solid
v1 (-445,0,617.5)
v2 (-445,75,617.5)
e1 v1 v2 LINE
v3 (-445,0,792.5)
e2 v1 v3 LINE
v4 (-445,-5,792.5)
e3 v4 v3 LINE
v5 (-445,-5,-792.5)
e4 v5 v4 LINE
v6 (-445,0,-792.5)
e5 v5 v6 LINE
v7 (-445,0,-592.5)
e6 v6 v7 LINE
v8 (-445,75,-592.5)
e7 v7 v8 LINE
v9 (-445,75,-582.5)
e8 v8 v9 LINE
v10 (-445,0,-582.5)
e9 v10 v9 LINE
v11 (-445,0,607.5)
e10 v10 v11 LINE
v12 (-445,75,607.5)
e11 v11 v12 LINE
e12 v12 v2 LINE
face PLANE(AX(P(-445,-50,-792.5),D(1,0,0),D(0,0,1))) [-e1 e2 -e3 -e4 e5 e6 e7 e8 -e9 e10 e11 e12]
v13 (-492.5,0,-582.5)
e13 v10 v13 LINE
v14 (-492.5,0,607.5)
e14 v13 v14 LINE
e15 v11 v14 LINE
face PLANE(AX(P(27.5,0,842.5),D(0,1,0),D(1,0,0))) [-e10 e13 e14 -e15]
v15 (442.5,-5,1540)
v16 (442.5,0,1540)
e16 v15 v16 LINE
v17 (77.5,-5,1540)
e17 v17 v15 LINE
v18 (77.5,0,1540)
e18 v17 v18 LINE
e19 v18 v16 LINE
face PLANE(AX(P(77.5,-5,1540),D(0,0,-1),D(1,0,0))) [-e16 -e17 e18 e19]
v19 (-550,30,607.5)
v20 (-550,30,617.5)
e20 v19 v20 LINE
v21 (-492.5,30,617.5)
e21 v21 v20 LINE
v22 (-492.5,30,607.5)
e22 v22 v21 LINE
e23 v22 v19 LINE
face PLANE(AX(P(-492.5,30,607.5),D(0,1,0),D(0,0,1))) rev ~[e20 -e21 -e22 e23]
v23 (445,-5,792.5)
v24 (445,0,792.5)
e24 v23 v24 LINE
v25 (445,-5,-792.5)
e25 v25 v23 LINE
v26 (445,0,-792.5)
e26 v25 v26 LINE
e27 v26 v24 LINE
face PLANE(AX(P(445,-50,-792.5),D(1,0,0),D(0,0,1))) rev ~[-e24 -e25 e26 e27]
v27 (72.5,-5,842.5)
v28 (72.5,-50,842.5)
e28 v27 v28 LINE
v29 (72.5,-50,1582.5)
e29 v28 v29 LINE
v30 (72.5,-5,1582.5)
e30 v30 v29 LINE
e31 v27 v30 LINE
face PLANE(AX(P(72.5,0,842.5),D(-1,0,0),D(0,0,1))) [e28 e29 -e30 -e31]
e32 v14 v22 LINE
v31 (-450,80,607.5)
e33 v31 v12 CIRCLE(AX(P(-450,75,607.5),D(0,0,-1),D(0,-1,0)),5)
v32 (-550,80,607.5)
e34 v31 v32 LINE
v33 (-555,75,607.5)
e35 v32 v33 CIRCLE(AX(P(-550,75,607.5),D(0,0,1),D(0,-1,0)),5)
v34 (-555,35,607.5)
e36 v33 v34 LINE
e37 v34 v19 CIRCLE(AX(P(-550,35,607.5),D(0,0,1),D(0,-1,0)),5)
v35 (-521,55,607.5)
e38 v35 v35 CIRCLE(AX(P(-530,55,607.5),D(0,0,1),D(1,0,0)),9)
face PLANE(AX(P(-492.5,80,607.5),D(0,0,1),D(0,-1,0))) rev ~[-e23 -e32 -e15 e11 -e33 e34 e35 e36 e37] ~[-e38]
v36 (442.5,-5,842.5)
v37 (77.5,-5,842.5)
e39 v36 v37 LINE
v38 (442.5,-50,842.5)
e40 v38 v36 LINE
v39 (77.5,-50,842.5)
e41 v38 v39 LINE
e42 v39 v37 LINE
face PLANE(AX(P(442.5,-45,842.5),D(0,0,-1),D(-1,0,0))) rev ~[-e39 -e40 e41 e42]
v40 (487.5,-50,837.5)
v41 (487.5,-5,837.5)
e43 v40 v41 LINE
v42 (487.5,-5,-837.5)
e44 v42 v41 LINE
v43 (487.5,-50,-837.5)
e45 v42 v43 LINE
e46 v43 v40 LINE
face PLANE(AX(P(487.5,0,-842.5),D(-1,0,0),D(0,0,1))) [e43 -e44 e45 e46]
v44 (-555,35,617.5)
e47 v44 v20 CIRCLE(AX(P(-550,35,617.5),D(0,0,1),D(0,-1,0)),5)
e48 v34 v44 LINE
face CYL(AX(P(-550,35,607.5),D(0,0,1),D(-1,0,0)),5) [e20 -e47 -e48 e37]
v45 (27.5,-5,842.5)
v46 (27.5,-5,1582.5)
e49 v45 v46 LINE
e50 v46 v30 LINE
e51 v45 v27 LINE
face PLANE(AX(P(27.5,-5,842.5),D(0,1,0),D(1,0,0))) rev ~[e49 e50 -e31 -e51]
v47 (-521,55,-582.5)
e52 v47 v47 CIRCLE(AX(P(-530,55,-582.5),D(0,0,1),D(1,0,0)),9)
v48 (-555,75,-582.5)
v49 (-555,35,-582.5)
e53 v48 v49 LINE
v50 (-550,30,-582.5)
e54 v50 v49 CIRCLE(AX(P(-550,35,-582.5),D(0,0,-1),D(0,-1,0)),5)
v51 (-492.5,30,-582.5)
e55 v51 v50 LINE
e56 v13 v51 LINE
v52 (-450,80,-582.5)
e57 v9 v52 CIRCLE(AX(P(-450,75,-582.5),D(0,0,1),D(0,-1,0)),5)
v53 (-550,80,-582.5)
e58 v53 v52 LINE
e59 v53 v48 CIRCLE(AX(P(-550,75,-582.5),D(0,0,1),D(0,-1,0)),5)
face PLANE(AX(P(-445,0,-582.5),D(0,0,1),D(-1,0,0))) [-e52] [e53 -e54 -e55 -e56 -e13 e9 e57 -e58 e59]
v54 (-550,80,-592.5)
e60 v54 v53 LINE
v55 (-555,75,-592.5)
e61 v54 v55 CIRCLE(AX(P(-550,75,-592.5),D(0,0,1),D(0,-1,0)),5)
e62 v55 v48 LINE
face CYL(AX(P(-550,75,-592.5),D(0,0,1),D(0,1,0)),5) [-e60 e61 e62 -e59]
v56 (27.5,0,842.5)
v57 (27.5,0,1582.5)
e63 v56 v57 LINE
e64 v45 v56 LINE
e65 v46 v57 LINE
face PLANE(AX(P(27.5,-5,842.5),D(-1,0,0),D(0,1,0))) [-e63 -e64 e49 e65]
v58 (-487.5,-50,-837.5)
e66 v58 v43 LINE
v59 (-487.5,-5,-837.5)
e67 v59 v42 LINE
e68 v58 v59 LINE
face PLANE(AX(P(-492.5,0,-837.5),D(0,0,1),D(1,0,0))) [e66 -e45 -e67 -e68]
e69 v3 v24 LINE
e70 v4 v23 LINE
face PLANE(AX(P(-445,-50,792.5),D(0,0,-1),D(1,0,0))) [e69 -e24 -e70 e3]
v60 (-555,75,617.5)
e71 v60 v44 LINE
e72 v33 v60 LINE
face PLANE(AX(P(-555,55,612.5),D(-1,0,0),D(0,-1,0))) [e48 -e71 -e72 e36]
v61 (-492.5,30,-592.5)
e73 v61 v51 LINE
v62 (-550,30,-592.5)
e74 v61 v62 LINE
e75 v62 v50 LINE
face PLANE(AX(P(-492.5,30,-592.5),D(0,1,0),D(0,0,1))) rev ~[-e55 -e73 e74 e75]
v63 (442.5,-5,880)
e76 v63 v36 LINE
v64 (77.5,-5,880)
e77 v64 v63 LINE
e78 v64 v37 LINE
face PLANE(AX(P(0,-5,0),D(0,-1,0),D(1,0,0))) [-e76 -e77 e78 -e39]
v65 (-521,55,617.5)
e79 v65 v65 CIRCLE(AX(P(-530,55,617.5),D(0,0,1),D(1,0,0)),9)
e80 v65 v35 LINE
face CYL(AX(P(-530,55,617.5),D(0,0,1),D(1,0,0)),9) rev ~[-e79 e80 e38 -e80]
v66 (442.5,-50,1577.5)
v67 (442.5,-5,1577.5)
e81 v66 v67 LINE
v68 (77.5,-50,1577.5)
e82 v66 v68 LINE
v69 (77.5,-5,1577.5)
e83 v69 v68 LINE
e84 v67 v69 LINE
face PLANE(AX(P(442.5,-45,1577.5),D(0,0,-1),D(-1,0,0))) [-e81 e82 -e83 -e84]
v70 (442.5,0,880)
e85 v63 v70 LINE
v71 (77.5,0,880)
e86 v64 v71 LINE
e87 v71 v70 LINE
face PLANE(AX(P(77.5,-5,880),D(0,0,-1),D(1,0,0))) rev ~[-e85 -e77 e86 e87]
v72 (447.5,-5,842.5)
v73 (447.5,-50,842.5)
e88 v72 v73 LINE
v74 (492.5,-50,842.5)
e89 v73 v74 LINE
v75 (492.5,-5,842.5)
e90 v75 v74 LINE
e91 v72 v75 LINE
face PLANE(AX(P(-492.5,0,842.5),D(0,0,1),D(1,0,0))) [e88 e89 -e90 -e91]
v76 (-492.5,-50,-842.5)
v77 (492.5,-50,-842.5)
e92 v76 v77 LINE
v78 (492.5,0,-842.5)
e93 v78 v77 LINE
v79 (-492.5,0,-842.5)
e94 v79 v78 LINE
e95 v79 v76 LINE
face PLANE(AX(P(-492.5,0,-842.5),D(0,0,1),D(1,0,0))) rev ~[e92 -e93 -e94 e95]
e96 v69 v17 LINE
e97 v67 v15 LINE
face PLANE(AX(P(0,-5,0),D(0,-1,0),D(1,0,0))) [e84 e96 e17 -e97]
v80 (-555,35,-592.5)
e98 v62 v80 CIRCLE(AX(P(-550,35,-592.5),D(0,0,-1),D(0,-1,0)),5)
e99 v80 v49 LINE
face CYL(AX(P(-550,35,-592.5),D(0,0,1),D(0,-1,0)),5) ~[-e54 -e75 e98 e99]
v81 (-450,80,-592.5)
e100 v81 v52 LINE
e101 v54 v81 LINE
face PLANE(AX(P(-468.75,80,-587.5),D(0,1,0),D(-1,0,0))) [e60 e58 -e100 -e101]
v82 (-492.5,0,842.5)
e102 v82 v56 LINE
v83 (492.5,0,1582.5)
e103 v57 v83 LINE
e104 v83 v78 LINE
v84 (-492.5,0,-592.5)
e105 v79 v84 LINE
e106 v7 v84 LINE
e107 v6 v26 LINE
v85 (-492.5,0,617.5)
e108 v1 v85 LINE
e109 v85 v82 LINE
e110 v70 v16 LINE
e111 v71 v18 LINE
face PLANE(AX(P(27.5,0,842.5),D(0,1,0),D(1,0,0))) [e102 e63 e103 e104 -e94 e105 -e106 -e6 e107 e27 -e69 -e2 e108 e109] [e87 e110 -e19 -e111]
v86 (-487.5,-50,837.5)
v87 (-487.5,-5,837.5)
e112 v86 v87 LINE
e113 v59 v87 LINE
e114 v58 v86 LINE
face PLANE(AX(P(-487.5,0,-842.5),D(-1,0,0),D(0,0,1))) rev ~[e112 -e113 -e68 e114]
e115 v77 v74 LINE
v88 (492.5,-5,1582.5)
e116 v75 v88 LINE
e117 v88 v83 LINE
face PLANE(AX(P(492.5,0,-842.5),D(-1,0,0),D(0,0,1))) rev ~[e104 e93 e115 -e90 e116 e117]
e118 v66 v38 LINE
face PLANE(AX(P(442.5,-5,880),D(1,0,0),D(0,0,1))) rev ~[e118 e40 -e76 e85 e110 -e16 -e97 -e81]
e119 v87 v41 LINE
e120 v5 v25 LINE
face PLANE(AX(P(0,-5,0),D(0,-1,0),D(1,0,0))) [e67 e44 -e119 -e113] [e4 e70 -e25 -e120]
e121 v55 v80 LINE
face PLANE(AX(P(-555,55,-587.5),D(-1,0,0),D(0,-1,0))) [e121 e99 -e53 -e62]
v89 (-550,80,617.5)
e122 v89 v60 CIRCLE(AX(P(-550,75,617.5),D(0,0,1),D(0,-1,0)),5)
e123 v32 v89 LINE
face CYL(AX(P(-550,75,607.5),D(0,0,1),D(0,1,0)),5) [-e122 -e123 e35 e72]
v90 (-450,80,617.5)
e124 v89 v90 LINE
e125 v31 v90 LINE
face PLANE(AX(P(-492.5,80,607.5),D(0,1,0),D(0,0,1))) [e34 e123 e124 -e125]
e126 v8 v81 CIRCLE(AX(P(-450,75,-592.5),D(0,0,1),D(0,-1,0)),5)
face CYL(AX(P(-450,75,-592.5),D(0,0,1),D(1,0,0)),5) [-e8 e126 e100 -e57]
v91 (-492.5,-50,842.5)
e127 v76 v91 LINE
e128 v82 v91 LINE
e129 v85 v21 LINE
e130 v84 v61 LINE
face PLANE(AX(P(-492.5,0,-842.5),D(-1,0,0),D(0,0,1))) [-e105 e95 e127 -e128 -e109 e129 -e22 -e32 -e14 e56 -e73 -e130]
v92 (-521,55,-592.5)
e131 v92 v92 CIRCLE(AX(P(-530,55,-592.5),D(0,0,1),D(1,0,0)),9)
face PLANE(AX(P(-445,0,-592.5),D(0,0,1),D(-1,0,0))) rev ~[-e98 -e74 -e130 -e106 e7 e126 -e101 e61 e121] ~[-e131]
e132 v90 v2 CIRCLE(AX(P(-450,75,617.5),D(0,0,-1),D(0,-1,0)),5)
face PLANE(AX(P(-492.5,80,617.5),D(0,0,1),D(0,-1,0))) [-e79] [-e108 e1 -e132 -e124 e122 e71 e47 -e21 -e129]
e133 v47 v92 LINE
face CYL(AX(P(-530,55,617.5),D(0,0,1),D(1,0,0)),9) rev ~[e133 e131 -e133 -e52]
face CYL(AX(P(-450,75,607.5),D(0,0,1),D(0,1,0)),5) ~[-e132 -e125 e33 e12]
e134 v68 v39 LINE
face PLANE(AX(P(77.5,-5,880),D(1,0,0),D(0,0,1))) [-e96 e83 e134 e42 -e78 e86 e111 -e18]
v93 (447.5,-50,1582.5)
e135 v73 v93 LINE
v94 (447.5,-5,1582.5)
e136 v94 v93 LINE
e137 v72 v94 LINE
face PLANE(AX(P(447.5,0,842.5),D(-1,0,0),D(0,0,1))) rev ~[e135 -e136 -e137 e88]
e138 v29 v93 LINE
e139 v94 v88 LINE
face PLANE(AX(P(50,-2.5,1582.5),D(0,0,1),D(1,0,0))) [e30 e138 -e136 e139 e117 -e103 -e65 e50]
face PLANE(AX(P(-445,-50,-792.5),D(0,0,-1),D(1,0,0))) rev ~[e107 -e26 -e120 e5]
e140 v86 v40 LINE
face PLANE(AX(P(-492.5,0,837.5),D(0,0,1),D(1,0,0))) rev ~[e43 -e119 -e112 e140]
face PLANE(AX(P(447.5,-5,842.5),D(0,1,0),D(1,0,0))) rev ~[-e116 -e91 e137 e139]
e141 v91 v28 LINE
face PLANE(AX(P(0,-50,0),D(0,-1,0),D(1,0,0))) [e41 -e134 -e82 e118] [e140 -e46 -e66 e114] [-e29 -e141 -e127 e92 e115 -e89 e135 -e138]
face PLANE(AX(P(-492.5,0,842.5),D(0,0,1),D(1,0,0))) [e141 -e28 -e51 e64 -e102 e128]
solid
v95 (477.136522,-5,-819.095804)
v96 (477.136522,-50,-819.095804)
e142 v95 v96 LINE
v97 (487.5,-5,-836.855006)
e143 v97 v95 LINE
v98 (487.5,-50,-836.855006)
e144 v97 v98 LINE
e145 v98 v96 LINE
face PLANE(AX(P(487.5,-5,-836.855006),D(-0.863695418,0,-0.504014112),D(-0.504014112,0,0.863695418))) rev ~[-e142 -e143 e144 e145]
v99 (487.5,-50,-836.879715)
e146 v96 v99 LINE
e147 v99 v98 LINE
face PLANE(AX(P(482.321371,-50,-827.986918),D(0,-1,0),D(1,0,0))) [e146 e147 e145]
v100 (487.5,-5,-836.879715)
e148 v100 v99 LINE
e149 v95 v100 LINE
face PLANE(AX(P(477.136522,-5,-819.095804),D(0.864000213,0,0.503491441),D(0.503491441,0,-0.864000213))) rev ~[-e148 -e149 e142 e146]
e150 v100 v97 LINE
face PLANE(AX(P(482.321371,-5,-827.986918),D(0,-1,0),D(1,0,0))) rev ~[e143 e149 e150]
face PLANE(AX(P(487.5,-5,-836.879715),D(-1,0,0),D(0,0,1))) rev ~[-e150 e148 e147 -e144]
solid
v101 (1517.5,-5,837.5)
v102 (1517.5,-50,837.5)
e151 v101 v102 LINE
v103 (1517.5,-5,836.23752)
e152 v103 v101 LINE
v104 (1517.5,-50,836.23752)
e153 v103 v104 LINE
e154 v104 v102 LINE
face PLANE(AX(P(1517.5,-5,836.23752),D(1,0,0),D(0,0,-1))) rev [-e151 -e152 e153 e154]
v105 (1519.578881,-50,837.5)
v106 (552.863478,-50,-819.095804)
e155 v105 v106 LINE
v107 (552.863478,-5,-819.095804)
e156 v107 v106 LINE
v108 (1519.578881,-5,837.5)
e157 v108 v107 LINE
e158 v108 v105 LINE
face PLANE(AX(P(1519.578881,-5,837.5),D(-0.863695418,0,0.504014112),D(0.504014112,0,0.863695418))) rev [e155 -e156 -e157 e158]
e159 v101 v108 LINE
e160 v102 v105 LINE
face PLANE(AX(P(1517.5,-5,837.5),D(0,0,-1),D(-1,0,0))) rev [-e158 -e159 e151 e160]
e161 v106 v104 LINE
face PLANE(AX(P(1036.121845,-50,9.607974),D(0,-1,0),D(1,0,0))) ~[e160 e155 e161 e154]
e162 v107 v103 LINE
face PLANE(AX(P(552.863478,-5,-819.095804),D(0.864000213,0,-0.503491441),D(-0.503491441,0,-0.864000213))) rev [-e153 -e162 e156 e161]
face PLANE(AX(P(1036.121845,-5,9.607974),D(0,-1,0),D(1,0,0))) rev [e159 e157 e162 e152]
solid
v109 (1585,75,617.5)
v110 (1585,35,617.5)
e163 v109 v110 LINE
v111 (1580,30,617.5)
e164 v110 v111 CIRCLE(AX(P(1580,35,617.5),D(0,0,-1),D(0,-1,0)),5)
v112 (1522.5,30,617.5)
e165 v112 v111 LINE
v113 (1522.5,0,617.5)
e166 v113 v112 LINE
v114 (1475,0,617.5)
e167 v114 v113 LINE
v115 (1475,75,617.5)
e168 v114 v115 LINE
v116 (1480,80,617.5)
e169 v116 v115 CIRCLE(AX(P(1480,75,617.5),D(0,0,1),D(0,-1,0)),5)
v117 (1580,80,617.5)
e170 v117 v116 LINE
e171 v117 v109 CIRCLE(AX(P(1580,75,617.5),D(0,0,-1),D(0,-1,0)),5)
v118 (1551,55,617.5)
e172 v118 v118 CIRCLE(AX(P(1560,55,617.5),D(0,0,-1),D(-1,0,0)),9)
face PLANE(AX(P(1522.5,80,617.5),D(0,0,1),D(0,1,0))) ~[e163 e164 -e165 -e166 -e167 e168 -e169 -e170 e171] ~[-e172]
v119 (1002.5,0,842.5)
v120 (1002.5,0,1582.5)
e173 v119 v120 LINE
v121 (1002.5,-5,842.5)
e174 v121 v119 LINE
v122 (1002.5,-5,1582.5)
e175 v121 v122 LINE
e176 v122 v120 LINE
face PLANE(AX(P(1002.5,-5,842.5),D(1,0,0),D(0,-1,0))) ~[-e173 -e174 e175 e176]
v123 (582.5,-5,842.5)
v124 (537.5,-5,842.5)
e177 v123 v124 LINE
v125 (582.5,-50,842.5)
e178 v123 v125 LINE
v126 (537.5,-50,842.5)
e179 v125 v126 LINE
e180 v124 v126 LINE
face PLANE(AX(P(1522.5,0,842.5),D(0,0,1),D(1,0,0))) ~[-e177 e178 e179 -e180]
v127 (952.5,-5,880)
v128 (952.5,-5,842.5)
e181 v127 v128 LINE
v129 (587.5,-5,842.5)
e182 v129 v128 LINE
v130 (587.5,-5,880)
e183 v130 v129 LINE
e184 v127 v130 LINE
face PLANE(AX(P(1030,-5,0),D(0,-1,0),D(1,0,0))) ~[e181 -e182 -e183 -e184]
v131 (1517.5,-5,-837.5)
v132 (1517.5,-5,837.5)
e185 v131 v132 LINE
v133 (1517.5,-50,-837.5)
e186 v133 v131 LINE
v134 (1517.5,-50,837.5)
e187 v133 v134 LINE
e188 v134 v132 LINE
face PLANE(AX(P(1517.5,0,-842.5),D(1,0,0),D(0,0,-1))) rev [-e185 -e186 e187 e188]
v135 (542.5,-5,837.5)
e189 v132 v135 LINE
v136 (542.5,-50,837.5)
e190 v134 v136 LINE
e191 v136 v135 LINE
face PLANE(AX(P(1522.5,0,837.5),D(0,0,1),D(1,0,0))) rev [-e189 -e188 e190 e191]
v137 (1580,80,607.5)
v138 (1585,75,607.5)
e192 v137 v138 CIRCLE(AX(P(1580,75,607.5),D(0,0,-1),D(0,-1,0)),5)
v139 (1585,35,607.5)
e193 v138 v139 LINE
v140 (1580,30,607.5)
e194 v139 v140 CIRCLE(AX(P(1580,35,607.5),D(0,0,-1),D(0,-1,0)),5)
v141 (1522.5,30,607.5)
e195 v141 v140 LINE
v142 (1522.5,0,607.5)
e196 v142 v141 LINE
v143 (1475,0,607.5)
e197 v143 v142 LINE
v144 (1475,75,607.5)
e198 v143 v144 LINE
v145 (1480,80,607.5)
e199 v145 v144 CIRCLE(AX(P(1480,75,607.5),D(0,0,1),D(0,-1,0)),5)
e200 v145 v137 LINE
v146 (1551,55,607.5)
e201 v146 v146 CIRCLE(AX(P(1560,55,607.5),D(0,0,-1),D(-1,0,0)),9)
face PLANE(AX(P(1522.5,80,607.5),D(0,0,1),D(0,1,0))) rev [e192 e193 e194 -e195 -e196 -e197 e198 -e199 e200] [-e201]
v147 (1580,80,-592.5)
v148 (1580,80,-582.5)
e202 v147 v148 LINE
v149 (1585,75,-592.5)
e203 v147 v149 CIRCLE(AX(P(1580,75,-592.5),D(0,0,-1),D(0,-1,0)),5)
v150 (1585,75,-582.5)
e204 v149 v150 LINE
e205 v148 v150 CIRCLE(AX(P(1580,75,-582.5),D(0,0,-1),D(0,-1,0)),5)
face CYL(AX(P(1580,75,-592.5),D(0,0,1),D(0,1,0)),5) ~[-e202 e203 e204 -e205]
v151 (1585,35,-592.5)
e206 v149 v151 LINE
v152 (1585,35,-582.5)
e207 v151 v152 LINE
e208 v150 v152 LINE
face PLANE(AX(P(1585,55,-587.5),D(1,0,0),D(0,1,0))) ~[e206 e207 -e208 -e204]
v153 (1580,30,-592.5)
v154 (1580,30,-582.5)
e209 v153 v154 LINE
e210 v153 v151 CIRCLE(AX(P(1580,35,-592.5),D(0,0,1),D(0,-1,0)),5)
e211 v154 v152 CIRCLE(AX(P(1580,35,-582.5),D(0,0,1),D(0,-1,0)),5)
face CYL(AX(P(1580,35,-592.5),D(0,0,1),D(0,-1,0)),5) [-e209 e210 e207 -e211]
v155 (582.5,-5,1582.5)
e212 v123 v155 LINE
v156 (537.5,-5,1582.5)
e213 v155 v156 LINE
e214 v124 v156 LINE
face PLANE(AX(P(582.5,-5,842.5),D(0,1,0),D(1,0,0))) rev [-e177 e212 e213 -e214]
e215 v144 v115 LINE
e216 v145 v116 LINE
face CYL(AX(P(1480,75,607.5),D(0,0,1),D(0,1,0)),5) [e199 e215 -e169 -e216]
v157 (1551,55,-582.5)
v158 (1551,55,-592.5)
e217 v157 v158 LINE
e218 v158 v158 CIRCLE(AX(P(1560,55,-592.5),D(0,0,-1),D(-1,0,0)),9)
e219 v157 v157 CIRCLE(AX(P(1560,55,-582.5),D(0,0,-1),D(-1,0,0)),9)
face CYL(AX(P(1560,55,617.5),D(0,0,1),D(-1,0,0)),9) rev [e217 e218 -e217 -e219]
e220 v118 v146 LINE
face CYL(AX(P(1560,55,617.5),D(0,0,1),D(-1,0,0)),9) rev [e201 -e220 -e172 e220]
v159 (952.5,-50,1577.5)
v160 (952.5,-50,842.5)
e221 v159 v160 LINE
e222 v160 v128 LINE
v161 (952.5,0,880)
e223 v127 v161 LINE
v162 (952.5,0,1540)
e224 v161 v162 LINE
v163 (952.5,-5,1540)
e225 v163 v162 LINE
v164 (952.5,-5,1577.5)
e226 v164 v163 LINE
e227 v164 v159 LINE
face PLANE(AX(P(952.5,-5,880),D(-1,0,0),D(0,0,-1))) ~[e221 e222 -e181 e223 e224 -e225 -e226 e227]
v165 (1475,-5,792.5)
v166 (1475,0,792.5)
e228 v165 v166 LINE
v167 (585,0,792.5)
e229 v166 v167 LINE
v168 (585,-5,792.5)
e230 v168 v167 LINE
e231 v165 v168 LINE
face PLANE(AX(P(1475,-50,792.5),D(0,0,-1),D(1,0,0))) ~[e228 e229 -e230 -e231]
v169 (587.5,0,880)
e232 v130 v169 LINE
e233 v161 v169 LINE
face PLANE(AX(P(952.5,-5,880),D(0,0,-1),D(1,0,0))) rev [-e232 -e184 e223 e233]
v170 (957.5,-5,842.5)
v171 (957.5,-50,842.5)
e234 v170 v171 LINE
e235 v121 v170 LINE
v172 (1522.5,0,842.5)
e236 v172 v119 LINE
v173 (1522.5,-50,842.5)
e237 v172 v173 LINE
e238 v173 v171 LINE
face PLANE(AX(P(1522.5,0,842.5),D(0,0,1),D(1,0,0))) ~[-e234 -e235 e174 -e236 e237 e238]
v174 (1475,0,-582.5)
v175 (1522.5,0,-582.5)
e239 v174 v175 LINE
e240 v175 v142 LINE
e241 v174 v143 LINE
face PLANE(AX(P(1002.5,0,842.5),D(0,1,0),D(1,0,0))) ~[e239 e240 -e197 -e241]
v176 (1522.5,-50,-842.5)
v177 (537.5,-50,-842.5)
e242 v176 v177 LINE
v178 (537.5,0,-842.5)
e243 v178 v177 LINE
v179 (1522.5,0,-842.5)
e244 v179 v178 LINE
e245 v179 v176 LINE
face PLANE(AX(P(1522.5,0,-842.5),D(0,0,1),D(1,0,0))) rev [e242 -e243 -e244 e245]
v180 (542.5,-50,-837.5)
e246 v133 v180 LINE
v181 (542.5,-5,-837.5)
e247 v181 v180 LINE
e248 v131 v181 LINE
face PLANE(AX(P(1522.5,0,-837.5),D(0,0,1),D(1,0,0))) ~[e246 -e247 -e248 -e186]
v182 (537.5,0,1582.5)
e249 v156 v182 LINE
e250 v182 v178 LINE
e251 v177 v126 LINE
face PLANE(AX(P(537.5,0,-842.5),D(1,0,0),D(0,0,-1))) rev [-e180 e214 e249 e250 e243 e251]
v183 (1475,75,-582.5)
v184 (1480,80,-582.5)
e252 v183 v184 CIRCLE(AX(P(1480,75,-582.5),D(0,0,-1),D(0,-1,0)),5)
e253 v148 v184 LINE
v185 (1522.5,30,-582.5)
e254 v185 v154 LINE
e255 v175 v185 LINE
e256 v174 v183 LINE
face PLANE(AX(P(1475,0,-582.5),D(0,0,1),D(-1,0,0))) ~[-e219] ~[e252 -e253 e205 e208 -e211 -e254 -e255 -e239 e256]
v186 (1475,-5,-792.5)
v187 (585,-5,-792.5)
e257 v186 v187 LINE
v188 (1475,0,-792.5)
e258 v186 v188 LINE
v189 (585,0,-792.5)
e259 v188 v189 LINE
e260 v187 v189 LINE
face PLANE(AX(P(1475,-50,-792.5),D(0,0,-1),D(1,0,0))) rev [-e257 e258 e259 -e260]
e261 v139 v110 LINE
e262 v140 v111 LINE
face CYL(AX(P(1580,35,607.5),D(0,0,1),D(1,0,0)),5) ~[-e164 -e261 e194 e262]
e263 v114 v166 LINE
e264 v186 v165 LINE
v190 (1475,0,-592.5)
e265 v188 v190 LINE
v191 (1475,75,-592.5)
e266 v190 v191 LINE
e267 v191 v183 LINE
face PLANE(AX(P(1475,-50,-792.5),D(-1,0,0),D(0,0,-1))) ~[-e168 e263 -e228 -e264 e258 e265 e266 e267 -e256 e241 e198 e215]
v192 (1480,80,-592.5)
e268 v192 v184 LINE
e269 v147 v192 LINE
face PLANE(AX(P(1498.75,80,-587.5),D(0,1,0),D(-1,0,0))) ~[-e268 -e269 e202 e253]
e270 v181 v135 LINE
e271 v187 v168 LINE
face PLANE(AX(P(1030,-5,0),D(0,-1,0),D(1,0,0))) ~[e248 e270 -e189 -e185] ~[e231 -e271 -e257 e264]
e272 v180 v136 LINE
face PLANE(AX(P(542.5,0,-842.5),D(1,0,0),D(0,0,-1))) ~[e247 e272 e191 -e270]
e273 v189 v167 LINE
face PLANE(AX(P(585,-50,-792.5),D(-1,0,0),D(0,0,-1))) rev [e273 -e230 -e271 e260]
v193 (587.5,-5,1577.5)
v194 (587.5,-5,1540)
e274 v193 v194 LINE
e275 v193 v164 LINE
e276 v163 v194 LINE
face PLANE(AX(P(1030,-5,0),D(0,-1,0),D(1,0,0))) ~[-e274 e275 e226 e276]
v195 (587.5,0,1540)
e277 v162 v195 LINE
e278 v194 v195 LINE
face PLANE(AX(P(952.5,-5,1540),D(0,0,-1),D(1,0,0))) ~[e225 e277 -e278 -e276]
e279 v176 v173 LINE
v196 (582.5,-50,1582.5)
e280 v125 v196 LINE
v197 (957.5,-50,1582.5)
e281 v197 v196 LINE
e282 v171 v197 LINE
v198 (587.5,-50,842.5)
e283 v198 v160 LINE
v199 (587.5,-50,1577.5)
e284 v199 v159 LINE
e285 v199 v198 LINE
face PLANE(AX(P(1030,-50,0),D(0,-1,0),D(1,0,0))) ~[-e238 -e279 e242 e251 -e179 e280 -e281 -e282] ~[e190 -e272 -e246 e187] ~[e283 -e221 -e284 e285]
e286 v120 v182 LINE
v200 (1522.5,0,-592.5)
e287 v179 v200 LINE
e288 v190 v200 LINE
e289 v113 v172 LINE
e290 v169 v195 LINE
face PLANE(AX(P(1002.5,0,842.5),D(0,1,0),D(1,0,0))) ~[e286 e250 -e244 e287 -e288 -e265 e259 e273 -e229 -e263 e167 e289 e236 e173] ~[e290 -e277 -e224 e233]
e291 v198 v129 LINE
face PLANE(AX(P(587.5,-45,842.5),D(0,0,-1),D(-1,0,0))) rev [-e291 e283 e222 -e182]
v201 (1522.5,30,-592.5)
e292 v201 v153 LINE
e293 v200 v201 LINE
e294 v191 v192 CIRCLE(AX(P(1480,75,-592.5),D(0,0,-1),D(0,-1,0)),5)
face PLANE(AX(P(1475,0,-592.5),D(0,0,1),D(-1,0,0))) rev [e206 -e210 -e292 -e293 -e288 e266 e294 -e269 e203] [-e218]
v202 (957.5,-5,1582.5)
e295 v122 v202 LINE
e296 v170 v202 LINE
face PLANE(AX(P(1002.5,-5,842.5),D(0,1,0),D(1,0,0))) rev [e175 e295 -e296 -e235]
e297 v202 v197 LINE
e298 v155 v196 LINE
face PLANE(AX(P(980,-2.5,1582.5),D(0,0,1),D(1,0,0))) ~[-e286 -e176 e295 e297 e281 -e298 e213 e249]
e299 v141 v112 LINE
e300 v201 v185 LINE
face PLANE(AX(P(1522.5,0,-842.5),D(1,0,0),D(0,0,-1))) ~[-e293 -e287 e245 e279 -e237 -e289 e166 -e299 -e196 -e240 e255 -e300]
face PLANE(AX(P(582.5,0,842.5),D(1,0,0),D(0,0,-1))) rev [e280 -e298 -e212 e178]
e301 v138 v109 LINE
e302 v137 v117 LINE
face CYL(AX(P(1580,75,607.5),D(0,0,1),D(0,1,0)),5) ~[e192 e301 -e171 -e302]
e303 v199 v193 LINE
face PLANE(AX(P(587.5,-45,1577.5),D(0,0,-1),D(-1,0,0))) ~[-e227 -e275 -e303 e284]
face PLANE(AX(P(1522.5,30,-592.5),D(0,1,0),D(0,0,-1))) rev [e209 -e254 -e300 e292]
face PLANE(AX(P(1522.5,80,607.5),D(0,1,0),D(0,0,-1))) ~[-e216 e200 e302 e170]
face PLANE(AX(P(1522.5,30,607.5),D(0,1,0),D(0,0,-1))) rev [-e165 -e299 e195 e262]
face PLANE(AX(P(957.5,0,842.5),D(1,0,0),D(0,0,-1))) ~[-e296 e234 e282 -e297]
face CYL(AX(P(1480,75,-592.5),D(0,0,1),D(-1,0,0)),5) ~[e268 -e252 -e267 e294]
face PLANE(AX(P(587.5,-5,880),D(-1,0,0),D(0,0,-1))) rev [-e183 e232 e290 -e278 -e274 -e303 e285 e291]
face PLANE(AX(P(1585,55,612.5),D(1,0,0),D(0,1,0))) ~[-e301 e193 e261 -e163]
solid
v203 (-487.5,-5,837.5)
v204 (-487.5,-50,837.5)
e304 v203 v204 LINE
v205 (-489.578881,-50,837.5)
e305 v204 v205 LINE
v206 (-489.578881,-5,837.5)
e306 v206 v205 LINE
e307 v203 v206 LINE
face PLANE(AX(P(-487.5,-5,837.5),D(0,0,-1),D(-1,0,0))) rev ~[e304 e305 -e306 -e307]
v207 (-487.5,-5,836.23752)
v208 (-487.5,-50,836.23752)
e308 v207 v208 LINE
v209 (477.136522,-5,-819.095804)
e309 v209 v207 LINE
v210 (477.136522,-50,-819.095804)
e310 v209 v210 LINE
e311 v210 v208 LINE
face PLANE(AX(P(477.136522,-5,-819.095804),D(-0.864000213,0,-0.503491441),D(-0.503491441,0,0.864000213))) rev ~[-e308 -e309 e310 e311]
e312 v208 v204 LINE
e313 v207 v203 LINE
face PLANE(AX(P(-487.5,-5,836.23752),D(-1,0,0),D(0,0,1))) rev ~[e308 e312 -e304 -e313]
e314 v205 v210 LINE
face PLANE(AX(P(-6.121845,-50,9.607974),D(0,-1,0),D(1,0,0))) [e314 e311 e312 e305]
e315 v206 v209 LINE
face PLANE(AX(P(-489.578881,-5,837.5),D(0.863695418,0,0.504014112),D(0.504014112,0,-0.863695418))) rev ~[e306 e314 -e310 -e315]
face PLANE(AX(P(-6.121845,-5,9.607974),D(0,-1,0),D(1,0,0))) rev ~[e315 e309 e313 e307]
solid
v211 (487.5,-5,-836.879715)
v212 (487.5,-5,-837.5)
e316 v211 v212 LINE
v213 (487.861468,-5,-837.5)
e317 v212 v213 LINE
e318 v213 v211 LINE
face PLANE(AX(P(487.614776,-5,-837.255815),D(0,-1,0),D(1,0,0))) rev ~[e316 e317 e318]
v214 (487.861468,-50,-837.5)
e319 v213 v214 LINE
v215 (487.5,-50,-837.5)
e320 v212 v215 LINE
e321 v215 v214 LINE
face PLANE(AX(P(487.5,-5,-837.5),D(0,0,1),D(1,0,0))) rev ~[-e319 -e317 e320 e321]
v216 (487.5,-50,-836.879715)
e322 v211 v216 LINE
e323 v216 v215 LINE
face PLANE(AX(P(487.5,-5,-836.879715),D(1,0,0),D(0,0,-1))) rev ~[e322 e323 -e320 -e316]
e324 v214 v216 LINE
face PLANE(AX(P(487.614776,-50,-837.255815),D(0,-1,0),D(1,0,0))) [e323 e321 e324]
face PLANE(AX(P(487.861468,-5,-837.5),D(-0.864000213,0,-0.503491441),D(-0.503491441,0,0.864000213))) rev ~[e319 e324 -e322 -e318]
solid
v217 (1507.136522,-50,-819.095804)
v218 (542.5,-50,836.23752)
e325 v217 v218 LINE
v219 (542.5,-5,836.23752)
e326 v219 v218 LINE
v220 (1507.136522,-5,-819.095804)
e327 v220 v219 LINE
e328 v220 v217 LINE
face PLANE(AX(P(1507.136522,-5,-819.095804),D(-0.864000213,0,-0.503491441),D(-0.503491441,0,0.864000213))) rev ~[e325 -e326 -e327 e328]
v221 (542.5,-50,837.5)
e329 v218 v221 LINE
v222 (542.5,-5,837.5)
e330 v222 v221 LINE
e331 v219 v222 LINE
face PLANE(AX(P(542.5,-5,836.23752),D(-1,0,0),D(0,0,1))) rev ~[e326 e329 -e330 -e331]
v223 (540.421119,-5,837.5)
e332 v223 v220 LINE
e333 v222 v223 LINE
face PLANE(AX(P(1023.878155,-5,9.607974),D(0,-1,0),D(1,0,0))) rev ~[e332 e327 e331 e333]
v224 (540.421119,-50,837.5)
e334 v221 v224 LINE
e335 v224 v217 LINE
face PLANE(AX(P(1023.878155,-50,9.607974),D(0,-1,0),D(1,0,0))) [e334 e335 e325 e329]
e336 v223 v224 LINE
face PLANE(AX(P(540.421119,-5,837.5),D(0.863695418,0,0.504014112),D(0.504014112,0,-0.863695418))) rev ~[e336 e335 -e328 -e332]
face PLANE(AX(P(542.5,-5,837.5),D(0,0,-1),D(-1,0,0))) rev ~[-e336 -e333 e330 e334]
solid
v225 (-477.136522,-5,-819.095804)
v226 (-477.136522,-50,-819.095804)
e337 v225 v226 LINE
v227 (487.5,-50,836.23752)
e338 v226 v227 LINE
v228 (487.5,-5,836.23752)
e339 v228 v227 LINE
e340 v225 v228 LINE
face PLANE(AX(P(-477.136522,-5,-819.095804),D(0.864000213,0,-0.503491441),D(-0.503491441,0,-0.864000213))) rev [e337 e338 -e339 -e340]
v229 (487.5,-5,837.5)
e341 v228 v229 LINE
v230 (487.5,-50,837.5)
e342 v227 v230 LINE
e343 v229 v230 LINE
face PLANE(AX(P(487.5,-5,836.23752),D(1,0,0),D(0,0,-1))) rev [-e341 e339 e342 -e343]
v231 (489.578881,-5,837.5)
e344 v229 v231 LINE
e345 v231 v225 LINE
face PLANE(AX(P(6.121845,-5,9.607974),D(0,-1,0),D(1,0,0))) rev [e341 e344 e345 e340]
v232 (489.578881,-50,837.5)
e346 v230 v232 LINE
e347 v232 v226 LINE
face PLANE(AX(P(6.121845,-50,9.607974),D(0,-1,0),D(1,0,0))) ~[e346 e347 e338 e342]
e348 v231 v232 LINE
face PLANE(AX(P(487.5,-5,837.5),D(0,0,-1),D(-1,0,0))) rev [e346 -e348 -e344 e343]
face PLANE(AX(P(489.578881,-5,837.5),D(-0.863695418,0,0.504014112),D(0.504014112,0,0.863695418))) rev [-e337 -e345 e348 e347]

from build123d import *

# Parameters (mm, degrees)
F0_W      = 985
F0_H      = 1685
F1_DEPTH  = 50
F2_T      = -5
F3_W      = 890
F3_H      = 1585
F4_DEPTH  = 50.001
F5_W      = 375
F5_H      = 740
F6_DEPTH  = 50
F7_T      = -5
F8_W      = 365
F8_H      = 660
F9_DEPTH  = 5.001
F10_W     = 45
F10_H     = 5
F11_DEPTH = 740
F13_DEPTH = 45
F16_W     = 47.5
F16_H     = 10
F17_DEPTH = 80
F18_W     = 50
F18_H     = 10
F19_DEPTH = 62.5
F20_R     = 9
F21_DEPTH = 1460.001
F22_R     = 5


# Not quite as in the source:
# - a shell that OpenCascade refuses in one call is made with other operations: the cavity is built on its own and cut out


with BuildPart() as f1:
    # F0 (on Front) → F1 (new body)
    with BuildSketch(Plane.XZ):
        Rectangle(F0_W, F0_H)
    extrude(amount=F1_DEPTH)

    # F2
    f2_openings = [f1.faces().sort_by_distance(p)[0] for p in [
        (0, -50, 0),
    ]]
    offset(amount=F2_T, openings=f2_openings)

    # F3 (on face) → F4 (cut, through all)
    with BuildSketch(Plane.XZ.offset(50)):
        Rectangle(F3_W, F3_H)
    extrude(amount=-F4_DEPTH, mode=Mode.SUBTRACT)

    # F5 (on Front) → F6 (join)
    with BuildSketch(Plane.XZ):
        with Locations((260, 1212.5)):
            Rectangle(F5_W, F5_H)
    extrude(amount=F6_DEPTH)

    # F7: a shell. OpenCascade refuses it in one call, so the cavity is built on its own and cut out:
    # the body offset inwards by the wall thickness, plus a prism from it out through each open face.
    f7_core = offset(f1.part, amount=F7_T, kind=Kind.INTERSECTION, mode=Mode.PRIVATE)
    f7_exits = [f7_core.faces().sort_by_distance(p)[0] for p in [
        (260, -45, 1210),
    ]]
    add(f7_core, mode=Mode.SUBTRACT)
    extrude(f7_exits, amount=-F7_T, mode=Mode.SUBTRACT)

    # F8 (on face) → F9 (cut, through all)
    with BuildSketch(Plane.XZ.offset(5)):
        with Locations((260, 1210)):
            Rectangle(F8_W, F8_H)
    extrude(amount=-F9_DEPTH, mode=Mode.SUBTRACT)

    # F10 (on face) → F11 (join)
    with BuildSketch(Plane.XY.offset(842.5)):
        with Locations((50, -2.5)):
            Rectangle(F10_W, F10_H)
        with Locations((470, -2.5)):
            Rectangle(F10_W, F10_H)
    extrude(amount=F11_DEPTH)

    # F16 (on face) → F17 (join)
    with BuildSketch(Plane(origin=(0, 0, 0), x_dir=(-1, 0, 0), z_dir=(0, 1, 0))):
        with Locations((468.75, -587.5)):
            Rectangle(F16_W, F16_H)
        with Locations((468.75, 612.5)):
            Rectangle(F16_W, F16_H)
    extrude(amount=F17_DEPTH)

    # F18 (on face) → F19 (join)
    with BuildSketch(Plane(origin=(-492.5, 0, 0), x_dir=(0, -1, 0), z_dir=(-1, 0, 0))):
        with Locations((-55, 612.5)):
            Rectangle(F18_W, F18_H)
        with Locations((-55, -587.5)):
            Rectangle(F18_W, F18_H)
    extrude(amount=F19_DEPTH)

    # F20 (on face) → F21 (cut, through all)
    with BuildSketch(Plane.XY.offset(617.5)):
        with Locations((-530, 55)):
            Circle(F20_R)
    extrude(amount=-F21_DEPTH, mode=Mode.SUBTRACT)

    # F22
    f22_edges = [f1.edges().sort_by_distance(p)[0] for p in [
        (-445, 80, 612.5),
        (-555, 80, 612.5),
        (-555, 30, 612.5),
        (-555, 30, -587.5),
        (-555, 80, -587.5),
        (-445, 80, -587.5),
    ]]
    fillet(f22_edges, radius=F22_R)


with BuildPart() as f13:
    # F12 (on face) → F13 (new body)
    with BuildSketch(Plane.XZ.offset(5)):
        Polygon((487.8614675759, -837.5), (487.5, -836.87971525), (487.5, -837.5), align=None)
    extrude(amount=F13_DEPTH)


with BuildPart() as f13b:
    # F12 (on face) → F13, piece 2 (new body)
    with BuildSketch(Plane.XZ.offset(5)):
        Polygon((487.5, -836.8550058622), (477.1365219459, -819.0958037114), (487.5, -836.87971525), align=None)
    extrude(amount=F13_DEPTH)


with BuildPart() as f13c:
    # F12 (on face) → F13, piece 3 (new body)
    with BuildSketch(Plane.XZ.offset(5)):
        Polygon((477.1365219459, -819.0958037114), (-487.5, 836.2375200634), (-487.5, 837.5), (-489.5788806122, 837.5), align=None)
    extrude(amount=F13_DEPTH)


with BuildPart() as f14_1:
    # F14: instance of F13c
    add(f13c.part.mirror(Plane.YZ))


with BuildPart() as f23_1:
    # F23: instance of F1
    add(f1.part.mirror(Plane.YZ.offset(515)))


with BuildPart() as f23_2:
    # F23: instance of F13c
    add(f13c.part.mirror(Plane.YZ.offset(515)))


with BuildPart() as f23_3:
    # F23: instance of F14_1
    add(f14_1.part.mirror(Plane.YZ.offset(515)))


solid = Compound([f1.part, f13.part, f13b.part, f13c.part, f14_1.part, f23_1.part, f23_2.part, f23_3.part])
